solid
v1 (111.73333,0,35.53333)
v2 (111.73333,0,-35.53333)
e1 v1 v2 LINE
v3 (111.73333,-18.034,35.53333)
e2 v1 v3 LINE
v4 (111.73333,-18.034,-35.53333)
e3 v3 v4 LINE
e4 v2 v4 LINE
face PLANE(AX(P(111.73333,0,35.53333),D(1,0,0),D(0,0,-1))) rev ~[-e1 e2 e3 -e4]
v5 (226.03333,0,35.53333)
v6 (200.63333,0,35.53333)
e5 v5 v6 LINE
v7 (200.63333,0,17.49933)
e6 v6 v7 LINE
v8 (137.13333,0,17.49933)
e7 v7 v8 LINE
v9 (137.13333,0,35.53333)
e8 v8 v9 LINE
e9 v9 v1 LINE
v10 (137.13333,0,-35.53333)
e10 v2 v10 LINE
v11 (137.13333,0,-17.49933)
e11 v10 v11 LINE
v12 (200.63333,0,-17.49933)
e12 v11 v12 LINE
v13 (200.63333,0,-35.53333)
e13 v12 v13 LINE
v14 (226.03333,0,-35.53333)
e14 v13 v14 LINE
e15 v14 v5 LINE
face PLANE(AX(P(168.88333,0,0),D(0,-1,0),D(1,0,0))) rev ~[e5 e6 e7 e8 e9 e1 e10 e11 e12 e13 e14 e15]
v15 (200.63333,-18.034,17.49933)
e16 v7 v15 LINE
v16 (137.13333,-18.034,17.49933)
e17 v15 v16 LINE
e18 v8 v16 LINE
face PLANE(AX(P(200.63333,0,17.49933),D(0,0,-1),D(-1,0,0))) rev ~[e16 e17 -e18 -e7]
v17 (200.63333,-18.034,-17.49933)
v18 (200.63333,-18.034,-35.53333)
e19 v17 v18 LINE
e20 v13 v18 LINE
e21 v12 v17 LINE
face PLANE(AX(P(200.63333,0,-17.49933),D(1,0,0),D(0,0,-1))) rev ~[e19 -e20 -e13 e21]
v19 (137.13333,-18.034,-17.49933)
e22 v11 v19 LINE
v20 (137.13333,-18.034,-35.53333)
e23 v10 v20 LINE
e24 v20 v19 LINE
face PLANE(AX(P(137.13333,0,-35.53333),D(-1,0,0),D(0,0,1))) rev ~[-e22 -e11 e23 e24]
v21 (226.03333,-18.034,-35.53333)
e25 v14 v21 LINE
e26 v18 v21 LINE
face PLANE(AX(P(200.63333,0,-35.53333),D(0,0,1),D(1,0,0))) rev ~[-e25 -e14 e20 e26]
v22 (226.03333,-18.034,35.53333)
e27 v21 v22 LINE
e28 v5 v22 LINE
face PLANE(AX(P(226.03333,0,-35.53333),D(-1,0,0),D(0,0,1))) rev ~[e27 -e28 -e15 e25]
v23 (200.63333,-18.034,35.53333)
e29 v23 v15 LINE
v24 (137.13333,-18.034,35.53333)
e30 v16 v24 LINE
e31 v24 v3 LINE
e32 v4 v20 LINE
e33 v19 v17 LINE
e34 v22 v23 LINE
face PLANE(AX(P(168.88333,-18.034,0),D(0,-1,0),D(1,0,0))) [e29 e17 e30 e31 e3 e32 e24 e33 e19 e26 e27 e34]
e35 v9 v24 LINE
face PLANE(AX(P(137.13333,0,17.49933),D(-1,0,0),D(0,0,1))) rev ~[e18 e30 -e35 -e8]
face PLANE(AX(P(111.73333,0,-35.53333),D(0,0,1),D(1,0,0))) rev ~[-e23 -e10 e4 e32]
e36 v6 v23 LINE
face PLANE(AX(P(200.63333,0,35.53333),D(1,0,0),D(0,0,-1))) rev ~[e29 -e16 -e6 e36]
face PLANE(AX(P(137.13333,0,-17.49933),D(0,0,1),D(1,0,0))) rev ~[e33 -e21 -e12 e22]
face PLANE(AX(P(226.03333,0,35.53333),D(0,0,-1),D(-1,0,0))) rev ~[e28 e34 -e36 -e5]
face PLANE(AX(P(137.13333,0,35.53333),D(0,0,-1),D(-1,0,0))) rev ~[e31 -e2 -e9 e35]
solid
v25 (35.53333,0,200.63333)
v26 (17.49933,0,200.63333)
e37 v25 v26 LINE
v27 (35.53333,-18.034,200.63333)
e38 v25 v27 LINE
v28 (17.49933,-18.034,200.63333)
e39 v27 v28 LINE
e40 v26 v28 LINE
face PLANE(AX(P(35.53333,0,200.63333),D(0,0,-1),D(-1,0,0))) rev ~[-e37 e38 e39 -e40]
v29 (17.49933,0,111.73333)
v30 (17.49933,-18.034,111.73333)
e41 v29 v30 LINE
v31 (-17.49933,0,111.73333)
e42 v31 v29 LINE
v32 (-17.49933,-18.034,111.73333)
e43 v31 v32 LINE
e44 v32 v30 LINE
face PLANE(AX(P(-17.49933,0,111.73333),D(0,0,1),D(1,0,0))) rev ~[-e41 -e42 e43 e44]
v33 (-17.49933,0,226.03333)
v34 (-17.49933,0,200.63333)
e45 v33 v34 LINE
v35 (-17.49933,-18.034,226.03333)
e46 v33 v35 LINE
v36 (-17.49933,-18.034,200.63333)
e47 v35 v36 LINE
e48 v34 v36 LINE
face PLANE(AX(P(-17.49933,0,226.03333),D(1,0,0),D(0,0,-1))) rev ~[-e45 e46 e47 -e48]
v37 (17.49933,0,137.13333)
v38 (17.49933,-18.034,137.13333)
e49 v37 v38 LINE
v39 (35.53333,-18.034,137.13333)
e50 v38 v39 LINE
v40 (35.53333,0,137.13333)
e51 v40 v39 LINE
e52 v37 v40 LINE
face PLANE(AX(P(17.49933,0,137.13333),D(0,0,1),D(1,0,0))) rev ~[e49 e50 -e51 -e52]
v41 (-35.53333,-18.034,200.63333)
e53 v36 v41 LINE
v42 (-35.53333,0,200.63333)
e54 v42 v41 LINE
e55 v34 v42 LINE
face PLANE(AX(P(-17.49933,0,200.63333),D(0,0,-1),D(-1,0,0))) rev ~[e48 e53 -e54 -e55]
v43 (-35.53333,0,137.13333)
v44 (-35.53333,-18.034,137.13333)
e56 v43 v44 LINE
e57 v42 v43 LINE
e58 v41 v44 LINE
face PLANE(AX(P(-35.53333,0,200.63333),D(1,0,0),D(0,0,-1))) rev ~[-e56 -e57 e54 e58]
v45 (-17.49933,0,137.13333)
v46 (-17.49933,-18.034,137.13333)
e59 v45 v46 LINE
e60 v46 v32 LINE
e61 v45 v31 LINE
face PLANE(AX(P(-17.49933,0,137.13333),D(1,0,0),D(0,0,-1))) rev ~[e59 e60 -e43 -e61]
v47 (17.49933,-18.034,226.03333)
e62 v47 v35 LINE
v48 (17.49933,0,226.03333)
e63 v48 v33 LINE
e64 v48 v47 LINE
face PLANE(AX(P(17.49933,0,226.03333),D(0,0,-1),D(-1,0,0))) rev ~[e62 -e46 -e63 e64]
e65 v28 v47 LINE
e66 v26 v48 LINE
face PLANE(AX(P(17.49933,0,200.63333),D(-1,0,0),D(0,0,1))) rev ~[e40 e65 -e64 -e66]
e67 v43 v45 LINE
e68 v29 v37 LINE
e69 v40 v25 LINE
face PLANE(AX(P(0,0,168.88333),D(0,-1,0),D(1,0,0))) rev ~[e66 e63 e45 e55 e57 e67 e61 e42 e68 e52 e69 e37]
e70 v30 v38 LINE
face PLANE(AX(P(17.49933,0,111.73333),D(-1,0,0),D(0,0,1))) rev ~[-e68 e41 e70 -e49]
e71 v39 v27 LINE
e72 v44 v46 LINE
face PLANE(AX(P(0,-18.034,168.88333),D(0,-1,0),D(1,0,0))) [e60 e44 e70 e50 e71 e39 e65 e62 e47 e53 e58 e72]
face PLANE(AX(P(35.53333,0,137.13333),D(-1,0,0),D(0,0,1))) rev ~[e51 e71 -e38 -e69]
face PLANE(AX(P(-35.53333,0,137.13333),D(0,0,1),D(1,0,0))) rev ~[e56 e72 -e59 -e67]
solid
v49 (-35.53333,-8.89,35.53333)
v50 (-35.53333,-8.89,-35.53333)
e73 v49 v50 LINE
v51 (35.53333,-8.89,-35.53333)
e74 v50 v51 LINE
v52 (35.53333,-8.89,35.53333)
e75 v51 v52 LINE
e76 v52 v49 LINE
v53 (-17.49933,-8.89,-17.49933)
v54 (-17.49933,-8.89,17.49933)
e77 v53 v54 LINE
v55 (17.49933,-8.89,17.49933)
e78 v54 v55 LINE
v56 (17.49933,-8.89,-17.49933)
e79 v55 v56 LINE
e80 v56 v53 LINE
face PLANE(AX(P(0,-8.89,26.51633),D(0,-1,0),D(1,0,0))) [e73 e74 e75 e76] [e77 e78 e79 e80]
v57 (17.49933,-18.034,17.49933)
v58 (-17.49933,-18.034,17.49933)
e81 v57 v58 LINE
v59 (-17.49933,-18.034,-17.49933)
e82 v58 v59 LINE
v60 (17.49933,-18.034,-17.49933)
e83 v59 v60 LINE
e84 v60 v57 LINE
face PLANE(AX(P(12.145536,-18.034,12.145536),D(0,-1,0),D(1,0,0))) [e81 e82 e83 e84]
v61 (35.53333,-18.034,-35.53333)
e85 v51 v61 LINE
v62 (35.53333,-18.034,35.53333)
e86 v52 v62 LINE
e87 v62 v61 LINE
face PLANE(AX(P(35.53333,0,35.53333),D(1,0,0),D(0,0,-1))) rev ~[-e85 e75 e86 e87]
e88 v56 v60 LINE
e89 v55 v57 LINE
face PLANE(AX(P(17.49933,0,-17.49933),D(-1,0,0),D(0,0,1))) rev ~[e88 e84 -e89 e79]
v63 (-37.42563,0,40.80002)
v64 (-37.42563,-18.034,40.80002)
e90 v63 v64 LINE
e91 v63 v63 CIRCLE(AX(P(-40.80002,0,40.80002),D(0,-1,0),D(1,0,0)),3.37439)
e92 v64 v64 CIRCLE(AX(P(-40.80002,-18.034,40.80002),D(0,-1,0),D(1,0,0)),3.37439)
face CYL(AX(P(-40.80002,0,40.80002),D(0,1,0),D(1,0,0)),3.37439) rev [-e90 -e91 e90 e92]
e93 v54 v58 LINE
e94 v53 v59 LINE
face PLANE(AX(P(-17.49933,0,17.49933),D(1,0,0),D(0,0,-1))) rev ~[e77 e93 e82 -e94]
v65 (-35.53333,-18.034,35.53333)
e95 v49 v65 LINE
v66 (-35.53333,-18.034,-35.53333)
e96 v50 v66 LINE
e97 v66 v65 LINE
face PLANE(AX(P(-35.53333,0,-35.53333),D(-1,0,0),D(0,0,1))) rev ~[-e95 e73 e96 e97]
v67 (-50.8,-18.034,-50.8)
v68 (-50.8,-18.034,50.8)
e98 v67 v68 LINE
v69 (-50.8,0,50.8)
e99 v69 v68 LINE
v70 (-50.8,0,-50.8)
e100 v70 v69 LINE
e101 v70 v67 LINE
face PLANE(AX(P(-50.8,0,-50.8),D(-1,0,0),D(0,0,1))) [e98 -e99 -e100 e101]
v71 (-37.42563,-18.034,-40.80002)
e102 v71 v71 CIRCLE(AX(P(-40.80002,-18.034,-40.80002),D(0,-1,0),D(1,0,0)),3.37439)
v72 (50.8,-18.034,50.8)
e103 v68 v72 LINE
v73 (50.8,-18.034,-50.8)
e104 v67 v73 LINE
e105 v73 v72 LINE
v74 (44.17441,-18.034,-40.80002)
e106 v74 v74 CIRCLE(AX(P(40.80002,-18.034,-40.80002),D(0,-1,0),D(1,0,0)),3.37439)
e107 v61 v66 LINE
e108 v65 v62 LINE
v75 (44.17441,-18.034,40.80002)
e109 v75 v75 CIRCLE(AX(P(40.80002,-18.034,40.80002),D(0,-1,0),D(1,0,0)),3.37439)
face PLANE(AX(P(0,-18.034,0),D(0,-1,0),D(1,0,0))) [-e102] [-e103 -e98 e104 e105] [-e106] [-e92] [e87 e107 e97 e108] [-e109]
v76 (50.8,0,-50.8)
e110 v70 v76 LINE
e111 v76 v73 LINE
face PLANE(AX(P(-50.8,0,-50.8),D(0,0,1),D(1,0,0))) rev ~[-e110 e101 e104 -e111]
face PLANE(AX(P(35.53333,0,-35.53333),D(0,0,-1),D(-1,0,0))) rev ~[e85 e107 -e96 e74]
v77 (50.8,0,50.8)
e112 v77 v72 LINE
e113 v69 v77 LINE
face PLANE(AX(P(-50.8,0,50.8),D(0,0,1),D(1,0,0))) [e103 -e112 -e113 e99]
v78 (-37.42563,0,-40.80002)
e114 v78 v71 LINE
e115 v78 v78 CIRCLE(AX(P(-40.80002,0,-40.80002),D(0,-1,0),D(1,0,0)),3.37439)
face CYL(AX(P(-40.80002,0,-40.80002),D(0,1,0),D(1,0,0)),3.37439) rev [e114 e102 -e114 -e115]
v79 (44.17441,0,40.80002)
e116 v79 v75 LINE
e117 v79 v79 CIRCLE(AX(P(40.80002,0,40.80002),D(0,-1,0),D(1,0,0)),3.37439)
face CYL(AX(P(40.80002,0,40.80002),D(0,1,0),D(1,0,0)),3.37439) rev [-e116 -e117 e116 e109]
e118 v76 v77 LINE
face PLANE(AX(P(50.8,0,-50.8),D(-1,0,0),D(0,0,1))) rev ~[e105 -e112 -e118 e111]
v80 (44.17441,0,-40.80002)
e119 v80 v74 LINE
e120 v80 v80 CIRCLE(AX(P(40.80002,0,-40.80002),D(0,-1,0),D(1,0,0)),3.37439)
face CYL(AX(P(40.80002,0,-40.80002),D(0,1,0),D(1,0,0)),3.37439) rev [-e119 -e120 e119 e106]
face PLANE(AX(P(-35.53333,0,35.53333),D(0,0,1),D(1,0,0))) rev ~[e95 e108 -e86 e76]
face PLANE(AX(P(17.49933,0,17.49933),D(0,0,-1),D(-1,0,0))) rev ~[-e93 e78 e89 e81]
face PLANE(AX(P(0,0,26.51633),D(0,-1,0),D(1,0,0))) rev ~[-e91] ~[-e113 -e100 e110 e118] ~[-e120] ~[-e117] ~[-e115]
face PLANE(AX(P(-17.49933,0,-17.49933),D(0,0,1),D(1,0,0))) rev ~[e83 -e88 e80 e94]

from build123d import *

# Parameters (mm, degrees)
F1_DEPTH = 18.034
F0_W     = 101.6
F0_H     = 101.6
F0_R     = 3.37439
F2_DEPTH = 8.89


# Not quite as in the source:
# - a feature names something its author has since deleted; it is built from what else it names


with BuildPart() as f1:
    # F0 (on Front) → F1 (new body)
    with BuildSketch(Plane.XZ):
        Polygon((-17.49933, 137.13333), (-17.49933, 111.73333), (17.49933, 111.73333), (17.49933, 137.13333), (35.53333, 137.13333), (35.53333, 200.63333), (17.49933, 200.63333), (17.49933, 226.03333), (-17.49933, 226.03333), (-17.49933, 200.63333), (-35.53333, 200.63333), (-35.53333, 137.13333), align=None)
    extrude(amount=F1_DEPTH)


with BuildPart() as f1b:
    # F0 (on Front) → F1, piece 2 (new body)
    with BuildSketch(Plane.XZ):
        Rectangle(F0_W, F0_H)
        with Locations((-40.80002, -40.80002)):
            Circle(F0_R, mode=Mode.SUBTRACT)
        with Locations((-40.80002, 40.80002)):
            Circle(F0_R, mode=Mode.SUBTRACT)
        with Locations((40.80002, -40.80002)):
            Circle(F0_R, mode=Mode.SUBTRACT)
        Polygon((35.53333, 35.53333), (35.53333, 17.49933), (35.53333, -17.49933), (35.53333, -35.53333), (-35.53333, -35.53333), (-35.53333, -17.49933), (-35.53333, 17.49933), (-35.53333, 35.53333), align=None, mode=Mode.SUBTRACT)
        with Locations((40.80002, 40.80002)):
            Circle(F0_R, mode=Mode.SUBTRACT)
    extrude(amount=F1_DEPTH)



with BuildPart() as f1c:
    # F0 (on Front) → F1, piece 3 (new body)
    with BuildSketch(Plane.XZ):
        with BuildLine():
            ThreePointArc((5.04e-08, 17.49933), (12.373894927, 12.3738948914), (17.49933, 0))
            Line((17.49933, 0), (17.49933, 17.49933))
            Line((17.49933, 17.49933), (5.04e-08, 17.49933))
        make_face()
        with BuildLine():
            ThreePointArc((-17.49933, 1.35e-08), (-12.3738948866, 12.3738949318), (5.04e-08, 17.49933))
            Line((5.04e-08, 17.49933), (-17.49933, 17.49933))
            Line((-17.49933, 17.49933), (-17.49933, 1.35e-08))
        make_face()
        with BuildLine():
            ThreePointArc((1.06e-08, -17.49933), (12.373894913, -12.3738949055), (17.49933, 0))
            ThreePointArc((17.49933, 0), (12.373894927, 12.3738948914), (5.04e-08, 17.49933))
            ThreePointArc((5.04e-08, 17.49933), (-12.3738948866, 12.3738949318), (-17.49933, 1.35e-08))
            ThreePointArc((-17.49933, 1.35e-08), (-12.3738949102, -12.3738949082), (1.06e-08, -17.49933))
        make_face()
        with BuildLine():
            Line((-17.49933, -17.49933), (1.06e-08, -17.49933))
            ThreePointArc((1.06e-08, -17.49933), (-12.3738949102, -12.3738949082), (-17.49933, 1.35e-08))
            Line((-17.49933, 1.35e-08), (-17.49933, -17.49933))
        make_face()
        with BuildLine():
            Line((17.49933, -17.49933), (17.49933, 0))
            ThreePointArc((17.49933, 0), (12.373894913, -12.3738949055), (1.06e-08, -17.49933))
            Line((1.06e-08, -17.49933), (17.49933, -17.49933))
        make_face()
    extrude(amount=F1_DEPTH)


with BuildPart() as f1d:
    # F0 (on Front) → F1, piece 4 (new body)
    with BuildSketch(Plane.XZ):
        Polygon((137.13333, 35.53333), (111.73333, 35.53333), (111.73333, -35.53333), (137.13333, -35.53333), (137.13333, -17.49933), (200.63333, -17.49933), (200.63333, -35.53333), (226.03333, -35.53333), (226.03333, 35.53333), (200.63333, 35.53333), (200.63333, 17.49933), (137.13333, 17.49933), align=None)
    extrude(amount=F1_DEPTH)


with BuildPart() as f1b_1:
    add(f1b.part)

    add(f1c.part)  # F2 merges F1c
    # F0 (on Front) → F2 (join)
    with BuildSketch(Plane.XZ):
        Polygon((-17.49933, 17.49933), (5.04e-08, 17.49933), (17.49933, 17.49933), (35.53333, 17.49933), (35.53333, 35.53333), (-35.53333, 35.53333), (-35.53333, 17.49933), align=None)
        Polygon((-17.49933, -17.49933), (-17.49933, 1.35e-08), (-17.49933, 17.49933), (-35.53333, 17.49933), (-35.53333, -17.49933), align=None)
        Polygon((17.49933, -17.49933), (1.06e-08, -17.49933), (-17.49933, -17.49933), (-35.53333, -17.49933), (-35.53333, -35.53333), (35.53333, -35.53333), (35.53333, -17.49933), align=None)
        Polygon((17.49933, 17.49933), (17.49933, 0), (17.49933, -17.49933), (35.53333, -17.49933), (35.53333, 17.49933), align=None)
    extrude(amount=F2_DEPTH)


solid = Compound([f1.part, f1d.part, f1b_1.part])
